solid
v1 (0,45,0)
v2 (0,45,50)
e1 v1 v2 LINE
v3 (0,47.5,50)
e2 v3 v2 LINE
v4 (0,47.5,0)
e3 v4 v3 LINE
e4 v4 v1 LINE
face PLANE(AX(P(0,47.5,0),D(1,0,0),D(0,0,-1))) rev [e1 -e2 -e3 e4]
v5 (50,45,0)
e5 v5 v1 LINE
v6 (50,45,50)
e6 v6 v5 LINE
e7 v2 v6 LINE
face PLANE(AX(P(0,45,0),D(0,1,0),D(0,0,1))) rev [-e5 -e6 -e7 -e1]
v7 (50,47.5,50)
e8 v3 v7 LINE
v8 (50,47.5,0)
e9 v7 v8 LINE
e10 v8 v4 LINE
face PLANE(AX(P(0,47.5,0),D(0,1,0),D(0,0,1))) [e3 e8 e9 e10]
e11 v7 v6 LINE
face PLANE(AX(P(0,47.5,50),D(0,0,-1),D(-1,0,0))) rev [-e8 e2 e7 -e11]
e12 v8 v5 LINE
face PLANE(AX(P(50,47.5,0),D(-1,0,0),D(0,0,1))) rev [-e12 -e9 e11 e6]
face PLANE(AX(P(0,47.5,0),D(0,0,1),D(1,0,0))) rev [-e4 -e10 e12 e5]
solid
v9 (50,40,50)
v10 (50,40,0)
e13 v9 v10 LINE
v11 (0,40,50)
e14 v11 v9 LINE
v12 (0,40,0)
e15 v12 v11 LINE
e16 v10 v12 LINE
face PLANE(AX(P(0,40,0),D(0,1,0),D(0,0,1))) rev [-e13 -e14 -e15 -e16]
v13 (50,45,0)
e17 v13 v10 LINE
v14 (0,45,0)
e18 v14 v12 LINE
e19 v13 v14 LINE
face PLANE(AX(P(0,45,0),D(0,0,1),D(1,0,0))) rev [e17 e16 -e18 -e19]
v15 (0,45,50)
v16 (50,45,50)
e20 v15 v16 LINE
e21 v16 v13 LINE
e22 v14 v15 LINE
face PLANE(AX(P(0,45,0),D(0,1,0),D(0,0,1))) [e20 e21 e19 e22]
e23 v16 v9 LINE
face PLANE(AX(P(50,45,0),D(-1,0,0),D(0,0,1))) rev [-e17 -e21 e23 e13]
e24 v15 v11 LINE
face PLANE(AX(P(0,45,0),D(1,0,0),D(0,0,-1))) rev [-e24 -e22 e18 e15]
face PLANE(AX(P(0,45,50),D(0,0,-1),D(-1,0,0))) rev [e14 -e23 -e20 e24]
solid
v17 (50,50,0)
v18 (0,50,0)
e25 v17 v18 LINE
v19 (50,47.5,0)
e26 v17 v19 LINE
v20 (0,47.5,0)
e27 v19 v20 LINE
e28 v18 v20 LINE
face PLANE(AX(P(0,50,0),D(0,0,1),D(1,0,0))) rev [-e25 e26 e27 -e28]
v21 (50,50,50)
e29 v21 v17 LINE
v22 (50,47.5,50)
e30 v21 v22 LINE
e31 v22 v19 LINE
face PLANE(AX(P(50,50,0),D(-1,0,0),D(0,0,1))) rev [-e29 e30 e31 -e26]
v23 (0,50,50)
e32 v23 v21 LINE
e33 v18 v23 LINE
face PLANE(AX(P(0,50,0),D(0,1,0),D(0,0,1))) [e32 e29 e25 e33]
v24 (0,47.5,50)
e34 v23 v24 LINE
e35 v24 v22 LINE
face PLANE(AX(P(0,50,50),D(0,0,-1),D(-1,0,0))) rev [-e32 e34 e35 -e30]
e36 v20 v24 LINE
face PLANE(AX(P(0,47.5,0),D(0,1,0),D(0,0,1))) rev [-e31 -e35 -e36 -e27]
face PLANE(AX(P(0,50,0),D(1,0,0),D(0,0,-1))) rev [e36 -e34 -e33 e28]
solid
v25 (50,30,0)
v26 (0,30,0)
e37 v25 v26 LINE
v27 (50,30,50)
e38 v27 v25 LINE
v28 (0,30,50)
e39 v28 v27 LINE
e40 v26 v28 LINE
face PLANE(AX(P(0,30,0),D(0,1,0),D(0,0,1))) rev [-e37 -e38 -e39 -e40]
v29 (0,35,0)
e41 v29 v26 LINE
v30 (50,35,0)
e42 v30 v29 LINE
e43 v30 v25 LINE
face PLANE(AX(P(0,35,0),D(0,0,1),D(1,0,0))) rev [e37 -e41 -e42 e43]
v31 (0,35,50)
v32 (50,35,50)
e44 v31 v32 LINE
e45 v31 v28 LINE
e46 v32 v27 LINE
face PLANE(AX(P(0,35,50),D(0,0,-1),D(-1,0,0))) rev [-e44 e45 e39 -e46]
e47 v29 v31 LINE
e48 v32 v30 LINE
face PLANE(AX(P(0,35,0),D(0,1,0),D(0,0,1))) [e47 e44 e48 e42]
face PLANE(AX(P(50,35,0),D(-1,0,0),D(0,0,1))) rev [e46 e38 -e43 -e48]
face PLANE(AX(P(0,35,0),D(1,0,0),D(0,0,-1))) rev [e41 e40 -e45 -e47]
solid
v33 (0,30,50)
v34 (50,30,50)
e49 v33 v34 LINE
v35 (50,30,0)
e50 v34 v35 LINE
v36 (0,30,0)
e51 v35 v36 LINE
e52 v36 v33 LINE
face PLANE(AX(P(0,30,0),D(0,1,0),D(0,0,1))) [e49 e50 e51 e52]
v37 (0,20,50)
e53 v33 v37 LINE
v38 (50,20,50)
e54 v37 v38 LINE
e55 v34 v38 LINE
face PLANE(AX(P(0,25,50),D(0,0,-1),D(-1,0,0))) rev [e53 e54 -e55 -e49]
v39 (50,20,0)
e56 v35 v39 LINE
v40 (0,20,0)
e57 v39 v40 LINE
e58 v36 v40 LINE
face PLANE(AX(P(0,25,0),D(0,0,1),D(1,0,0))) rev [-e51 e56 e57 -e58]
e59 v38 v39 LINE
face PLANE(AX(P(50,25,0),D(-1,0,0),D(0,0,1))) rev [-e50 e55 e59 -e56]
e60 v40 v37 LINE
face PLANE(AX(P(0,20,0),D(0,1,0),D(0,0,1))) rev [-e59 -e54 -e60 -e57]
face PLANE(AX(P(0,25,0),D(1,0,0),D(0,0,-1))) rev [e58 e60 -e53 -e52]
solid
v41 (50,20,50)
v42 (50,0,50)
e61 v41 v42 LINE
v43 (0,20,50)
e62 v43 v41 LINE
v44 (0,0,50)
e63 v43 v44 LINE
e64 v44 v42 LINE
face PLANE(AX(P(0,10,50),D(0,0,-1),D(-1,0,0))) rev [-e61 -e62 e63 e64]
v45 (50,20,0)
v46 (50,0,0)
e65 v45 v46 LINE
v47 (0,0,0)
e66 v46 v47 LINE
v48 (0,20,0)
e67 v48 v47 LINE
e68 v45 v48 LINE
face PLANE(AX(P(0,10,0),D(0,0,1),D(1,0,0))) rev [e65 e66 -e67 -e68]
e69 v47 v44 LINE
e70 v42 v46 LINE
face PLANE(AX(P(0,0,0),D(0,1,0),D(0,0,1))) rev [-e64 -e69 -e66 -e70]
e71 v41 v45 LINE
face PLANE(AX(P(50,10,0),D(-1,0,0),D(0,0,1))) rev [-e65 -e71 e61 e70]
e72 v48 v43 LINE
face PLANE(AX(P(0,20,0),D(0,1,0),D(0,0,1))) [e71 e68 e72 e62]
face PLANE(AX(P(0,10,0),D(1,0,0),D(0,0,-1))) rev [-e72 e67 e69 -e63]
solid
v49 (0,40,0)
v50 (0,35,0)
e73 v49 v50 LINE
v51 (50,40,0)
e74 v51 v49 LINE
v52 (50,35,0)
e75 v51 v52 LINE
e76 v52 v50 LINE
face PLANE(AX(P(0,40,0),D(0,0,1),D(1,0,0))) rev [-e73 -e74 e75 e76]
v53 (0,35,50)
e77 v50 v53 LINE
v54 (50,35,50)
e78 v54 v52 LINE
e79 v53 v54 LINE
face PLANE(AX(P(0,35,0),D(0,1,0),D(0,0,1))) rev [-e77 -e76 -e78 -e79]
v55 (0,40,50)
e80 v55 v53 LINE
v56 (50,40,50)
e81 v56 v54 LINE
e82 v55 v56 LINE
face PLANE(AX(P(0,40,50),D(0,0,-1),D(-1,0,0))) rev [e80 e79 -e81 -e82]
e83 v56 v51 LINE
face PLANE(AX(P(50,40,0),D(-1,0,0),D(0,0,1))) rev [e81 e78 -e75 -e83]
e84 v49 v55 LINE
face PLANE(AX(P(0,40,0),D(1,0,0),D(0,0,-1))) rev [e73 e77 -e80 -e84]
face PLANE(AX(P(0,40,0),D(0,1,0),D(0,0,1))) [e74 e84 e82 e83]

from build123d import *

# Parameters (mm, degrees)
SKETCH_1_W             = 50
SKETCH_1_H             = 50
EXTRUDE_1_DEPTH        = 5
PATTERN_LINEAR_1_COUNT = 9
PATTERN_LINEAR_1_PITCH = 5
SKETCH_2_W             = 50
SKETCH_2_H             = 50
EXTRUDE_2_DEPTH        = 2.5
SKETCH_3_W             = 50
SKETCH_3_H             = 50
EXTRUDE_3_DEPTH        = 2.5


with BuildPart() as part:
    # 草图1 → 凸台-拉伸1 (new body)
    with BuildSketch(Plane(origin=(0, 0, 0), x_dir=(1, 0, 0), z_dir=(0, 1, 0))):
        with Locations((25, -25)):
            Rectangle(SKETCH_1_W, SKETCH_1_H)
    extrude(amount=EXTRUDE_1_DEPTH)


with BuildPart() as pattern_linear_1_1:
    # 阵列(线性)1: pattern copy
    add(part.part.moved(Location(Vector(0, 1, 0) * (1 * PATTERN_LINEAR_1_PITCH))))


with BuildPart() as pattern_linear_1_2:
    # 阵列(线性)1: pattern copy
    add(part.part.moved(Location(Vector(0, 1, 0) * (2 * PATTERN_LINEAR_1_PITCH))))


with BuildPart() as pattern_linear_1_3:
    # 阵列(线性)1: pattern copy
    add(part.part.moved(Location(Vector(0, 1, 0) * (3 * PATTERN_LINEAR_1_PITCH))))


with BuildPart() as pattern_linear_1_4:
    # 阵列(线性)1: pattern copy
    add(part.part.moved(Location(Vector(0, 1, 0) * (4 * PATTERN_LINEAR_1_PITCH))))


with BuildPart() as pattern_linear_1_5:
    # 阵列(线性)1: pattern copy
    add(part.part.moved(Location(Vector(0, 1, 0) * (5 * PATTERN_LINEAR_1_PITCH))))

    # Combine 2: read off the stored shape, not the designer's step
    # Combine 2: union 阵列(线性)1_4
    add(pattern_linear_1_4.part)


with BuildPart() as pattern_linear_1_6:
    # 阵列(线性)1: pattern copy
    add(part.part.moved(Location(Vector(0, 1, 0) * (6 * PATTERN_LINEAR_1_PITCH))))


with BuildPart() as pattern_linear_1_7:
    # 阵列(线性)1: pattern copy
    add(part.part.moved(Location(Vector(0, 1, 0) * (7 * PATTERN_LINEAR_1_PITCH))))


with BuildPart() as pattern_linear_1_8:
    # 阵列(线性)1: pattern copy
    add(part.part.moved(Location(Vector(0, 1, 0) * (8 * PATTERN_LINEAR_1_PITCH))))


with BuildPart() as pattern_linear_1_2_1:
    add(pattern_linear_1_2.part)

    # Combine 1: read off the stored shape, not the designer's step
    # Combine 1: union part, 阵列(线性)1_3, 阵列(线性)1_1
    add(part.part)
    add(pattern_linear_1_3.part)
    add(pattern_linear_1_1.part)


with BuildPart() as body_6:
    # 草图2 → 凸台-拉伸2 (new body)
    with BuildSketch(Plane(origin=(0, 45, 0), x_dir=(1, 0, 0), z_dir=(0, 1, 0))):
        with Locations((25, -25)):
            Rectangle(SKETCH_2_W, SKETCH_2_H)
    extrude(amount=EXTRUDE_2_DEPTH)


with BuildPart() as body_7:
    # 草图3 → 凸台-拉伸3 (new body)
    with BuildSketch(Plane(origin=(0, 47.5, 0), x_dir=(1, 0, 0), z_dir=(0, 1, 0))):
        with Locations((25, -25)):
            Rectangle(SKETCH_3_W, SKETCH_3_H)
    extrude(amount=EXTRUDE_3_DEPTH)


solid = Compound([pattern_linear_1_5.part, pattern_linear_1_6.part, pattern_linear_1_7.part, pattern_linear_1_8.part, pattern_linear_1_2_1.part, body_6.part, body_7.part])
